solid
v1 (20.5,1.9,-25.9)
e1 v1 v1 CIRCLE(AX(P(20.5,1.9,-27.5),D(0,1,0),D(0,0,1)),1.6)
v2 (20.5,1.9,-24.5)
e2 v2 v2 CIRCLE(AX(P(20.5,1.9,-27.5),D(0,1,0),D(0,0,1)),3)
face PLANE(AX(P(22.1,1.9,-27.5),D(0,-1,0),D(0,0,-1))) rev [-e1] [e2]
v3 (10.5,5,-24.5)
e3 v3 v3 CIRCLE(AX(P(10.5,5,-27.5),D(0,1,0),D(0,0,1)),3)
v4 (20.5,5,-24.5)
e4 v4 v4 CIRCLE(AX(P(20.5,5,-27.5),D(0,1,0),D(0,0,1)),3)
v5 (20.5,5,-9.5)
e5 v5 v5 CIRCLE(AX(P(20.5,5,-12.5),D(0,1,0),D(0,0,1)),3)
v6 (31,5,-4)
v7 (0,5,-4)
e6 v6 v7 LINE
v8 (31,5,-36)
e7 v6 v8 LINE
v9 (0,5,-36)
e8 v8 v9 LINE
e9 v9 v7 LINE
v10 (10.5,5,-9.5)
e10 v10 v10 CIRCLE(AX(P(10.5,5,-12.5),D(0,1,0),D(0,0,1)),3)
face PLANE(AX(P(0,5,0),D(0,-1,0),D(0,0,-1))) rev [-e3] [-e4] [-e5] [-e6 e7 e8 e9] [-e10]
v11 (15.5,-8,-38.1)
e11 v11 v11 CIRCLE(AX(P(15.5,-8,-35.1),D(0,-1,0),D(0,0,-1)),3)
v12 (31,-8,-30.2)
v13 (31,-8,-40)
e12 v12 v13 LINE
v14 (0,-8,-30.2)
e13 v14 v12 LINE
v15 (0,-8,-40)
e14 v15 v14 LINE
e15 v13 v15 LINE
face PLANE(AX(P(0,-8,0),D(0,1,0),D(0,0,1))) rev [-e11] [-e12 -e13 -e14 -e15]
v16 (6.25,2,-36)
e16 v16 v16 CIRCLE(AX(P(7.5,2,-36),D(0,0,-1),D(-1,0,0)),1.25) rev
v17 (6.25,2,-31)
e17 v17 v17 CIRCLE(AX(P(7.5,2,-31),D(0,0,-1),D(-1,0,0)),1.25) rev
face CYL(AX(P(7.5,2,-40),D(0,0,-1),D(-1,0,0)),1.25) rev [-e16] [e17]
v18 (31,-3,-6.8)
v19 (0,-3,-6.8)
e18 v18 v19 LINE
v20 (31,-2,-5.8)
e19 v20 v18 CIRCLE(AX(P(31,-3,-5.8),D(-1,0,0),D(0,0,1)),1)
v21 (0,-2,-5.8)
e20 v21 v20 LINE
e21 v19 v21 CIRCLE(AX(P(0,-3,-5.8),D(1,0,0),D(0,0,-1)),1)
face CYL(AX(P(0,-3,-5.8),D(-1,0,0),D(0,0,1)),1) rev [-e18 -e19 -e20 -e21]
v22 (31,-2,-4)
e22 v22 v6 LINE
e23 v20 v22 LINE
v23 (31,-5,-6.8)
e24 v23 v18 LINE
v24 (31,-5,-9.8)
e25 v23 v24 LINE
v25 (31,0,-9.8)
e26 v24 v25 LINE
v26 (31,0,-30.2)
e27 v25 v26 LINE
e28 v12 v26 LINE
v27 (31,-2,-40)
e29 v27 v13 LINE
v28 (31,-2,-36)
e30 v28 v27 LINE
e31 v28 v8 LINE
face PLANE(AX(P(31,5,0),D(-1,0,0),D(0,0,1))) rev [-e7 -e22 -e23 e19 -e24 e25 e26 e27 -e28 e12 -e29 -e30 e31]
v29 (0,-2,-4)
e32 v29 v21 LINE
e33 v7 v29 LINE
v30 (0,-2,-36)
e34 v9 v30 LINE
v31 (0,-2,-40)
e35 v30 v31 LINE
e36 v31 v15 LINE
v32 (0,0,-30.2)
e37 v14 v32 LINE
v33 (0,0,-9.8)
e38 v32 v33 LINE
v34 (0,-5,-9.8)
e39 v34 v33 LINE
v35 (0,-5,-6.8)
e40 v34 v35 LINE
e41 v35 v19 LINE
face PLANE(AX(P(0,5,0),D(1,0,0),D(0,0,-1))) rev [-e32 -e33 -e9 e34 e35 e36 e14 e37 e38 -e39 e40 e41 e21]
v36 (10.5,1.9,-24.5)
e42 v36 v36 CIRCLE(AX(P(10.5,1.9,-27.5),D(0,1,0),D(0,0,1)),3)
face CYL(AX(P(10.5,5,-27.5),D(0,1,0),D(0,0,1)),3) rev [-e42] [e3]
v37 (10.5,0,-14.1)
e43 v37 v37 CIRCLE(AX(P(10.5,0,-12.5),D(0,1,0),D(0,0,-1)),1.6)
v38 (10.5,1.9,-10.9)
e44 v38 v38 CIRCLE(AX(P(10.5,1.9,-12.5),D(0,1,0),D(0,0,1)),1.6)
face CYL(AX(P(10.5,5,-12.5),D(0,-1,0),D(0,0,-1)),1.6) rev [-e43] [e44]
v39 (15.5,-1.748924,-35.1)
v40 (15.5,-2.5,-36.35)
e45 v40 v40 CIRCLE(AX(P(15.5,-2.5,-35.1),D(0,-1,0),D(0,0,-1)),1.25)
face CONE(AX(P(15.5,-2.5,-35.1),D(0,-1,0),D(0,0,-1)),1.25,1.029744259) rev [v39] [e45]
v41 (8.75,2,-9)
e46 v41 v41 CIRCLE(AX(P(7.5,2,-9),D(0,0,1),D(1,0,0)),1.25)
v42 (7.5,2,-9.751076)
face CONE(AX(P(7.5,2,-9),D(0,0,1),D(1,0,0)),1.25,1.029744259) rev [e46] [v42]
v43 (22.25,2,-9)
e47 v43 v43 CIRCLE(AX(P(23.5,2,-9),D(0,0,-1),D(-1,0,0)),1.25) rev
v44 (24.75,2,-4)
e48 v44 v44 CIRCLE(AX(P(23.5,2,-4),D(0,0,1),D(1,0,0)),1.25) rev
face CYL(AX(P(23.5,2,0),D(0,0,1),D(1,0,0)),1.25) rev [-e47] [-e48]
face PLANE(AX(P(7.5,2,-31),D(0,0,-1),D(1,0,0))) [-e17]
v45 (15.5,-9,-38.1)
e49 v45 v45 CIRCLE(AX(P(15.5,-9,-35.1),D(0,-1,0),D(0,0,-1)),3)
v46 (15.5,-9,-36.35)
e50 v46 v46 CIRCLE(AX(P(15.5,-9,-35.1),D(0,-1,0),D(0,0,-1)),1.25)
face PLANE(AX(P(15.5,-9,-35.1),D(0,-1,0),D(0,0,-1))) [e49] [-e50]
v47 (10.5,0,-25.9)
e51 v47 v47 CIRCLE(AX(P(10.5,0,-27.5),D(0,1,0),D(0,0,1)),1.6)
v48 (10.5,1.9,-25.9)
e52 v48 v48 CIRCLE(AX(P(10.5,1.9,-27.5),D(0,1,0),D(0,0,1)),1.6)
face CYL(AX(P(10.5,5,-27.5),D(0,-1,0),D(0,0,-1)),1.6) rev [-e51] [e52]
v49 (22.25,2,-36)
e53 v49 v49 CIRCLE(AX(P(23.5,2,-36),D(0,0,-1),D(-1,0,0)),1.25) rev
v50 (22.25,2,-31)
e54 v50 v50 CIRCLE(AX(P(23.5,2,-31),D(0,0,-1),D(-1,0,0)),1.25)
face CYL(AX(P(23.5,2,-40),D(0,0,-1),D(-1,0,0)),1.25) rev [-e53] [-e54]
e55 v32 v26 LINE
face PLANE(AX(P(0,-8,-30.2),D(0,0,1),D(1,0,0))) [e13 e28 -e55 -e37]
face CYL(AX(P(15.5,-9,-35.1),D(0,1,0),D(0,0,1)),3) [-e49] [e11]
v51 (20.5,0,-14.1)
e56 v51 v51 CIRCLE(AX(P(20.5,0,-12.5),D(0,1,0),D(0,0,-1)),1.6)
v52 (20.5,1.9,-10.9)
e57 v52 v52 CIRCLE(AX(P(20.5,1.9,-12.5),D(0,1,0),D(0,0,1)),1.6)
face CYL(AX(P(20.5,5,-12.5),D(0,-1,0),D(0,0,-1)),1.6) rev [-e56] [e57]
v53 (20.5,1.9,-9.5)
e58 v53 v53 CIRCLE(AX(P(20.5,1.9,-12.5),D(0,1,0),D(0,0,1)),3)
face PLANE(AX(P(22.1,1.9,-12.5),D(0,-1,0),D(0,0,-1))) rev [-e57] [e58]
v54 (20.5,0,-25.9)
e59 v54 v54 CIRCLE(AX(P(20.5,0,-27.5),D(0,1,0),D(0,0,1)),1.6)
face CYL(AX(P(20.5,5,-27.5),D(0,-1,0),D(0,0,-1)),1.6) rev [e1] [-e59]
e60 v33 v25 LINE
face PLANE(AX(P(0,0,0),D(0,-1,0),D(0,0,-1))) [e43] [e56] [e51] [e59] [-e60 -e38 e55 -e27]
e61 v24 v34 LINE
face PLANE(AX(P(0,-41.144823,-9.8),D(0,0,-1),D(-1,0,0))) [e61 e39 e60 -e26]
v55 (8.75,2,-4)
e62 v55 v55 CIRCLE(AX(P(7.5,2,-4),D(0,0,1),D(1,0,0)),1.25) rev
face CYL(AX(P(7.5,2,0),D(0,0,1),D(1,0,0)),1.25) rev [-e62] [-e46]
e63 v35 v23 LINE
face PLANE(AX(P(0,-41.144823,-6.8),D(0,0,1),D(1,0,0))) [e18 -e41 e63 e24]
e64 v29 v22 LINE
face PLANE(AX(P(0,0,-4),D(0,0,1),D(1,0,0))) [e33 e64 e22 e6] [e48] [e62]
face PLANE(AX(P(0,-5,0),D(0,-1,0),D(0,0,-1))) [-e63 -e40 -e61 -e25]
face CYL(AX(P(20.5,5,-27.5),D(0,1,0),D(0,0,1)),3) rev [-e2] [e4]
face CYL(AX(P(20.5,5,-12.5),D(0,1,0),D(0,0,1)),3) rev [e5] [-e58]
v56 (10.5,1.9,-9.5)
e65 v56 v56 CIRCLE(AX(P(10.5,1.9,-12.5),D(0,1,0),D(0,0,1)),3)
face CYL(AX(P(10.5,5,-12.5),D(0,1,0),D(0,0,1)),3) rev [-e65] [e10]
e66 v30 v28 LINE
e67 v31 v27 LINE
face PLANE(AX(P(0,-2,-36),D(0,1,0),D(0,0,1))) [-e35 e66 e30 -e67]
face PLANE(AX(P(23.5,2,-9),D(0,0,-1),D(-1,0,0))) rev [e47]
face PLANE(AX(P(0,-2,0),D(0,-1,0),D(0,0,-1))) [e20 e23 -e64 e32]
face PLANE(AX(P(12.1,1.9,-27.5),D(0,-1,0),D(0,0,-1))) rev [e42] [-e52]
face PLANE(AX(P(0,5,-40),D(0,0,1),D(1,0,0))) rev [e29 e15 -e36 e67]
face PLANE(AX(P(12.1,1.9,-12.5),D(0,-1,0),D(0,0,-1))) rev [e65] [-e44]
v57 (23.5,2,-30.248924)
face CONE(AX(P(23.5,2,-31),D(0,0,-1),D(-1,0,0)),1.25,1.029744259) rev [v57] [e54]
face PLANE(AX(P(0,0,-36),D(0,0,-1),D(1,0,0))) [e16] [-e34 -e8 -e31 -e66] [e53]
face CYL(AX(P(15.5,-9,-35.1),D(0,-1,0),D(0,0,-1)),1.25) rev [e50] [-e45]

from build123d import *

# Parameters (mm, degrees)
SKETCH_1_W                     = 31
SKETCH_1_H                     = 40
SKETCH_1_R                     = 1.6
EXTRUDE_1_DEPTH                = 5
SKETCH_2_W                     = 31
SKETCH_2_H                     = 9.8
EXTRUDE_3_DEPTH                = 8
SKETCH_13_R                    = 1
CUT_EXTRUDE_7_DEPTH            = 5
EXTRUDE_START                  = 1
SKETCH_14_R                    = 3
SKETCH_14_R_2                  = 1
EXTRUDE_8_DEPTH                = 1
HOLE_WIZARD_M3_3_D             = 2.5
HOLE_WIZARD_M3_3_DEPTH         = 6.5
HOLE_WIZARD_M3_3_TIP           = 0.751075774
SKETCH_18_W                    = 31
SKETCH_18_H                    = 3
EXTRUDE_9_DEPTH                = 10
SKETCH_29_W                    = 31
SKETCH_29_H                    = 6.8
EXTRUDE_11_DEPTH               = 2
SKETCH_20_R                    = 1
CUT_EXTRUDE_9_DEPTH            = 9
HOLE_START                     = -9
HOLE_WIZARD_M3_1_OUTLINE_R     = 1.25
HOLE_WIZARD_M3_1_OUTLINE_R_2   = 1
HOLE_WIZARD_M3_1_DEPTH         = 9
HOLE_WIZARD_M3_1_3_D           = 3.2
HOLE_WIZARD_M3_1_3_CBORE_D     = 6
HOLE_WIZARD_M3_1_3_CBORE_DEPTH = 3.1
HOLE_START_2                   = -40
HOLE_WIZARD_M3_2_OUTLINE_R     = 1.25
HOLE_WIZARD_M3_2_OUTLINE_R_2   = 1
HOLE_WIZARD_M3_2_DEPTH         = 9
FILLET_2_R                     = 1
SKETCH_30_W                    = 31
SKETCH_30_H                    = 7
CUT_EXTRUDE_10_DEPTH           = 4


# Read off the part's stored shape, not the designer's step: M3 螺纹孔1, M3 螺纹孔2
with BuildPart() as part:
    # 草图1 → 凸台-拉伸1 (new body)
    with BuildSketch(Plane(origin=(0, 0, 0), x_dir=(1, 0, 0), z_dir=(0, 1, 0))):
        with Locations((15.5, 20)):
            Rectangle(SKETCH_1_W, SKETCH_1_H)
        with Locations(Location((20.5, 27.5, 0), (0, 0, 270))):
            Circle(SKETCH_1_R, mode=Mode.SUBTRACT)
        with Locations(Location((10.5, 27.5, 0), (0, 0, 270))):
            Circle(SKETCH_1_R, mode=Mode.SUBTRACT)
        with Locations(Location((10.5, 12.5, 0), (0, 0, 90))):
            Circle(SKETCH_1_R, mode=Mode.SUBTRACT)
        with Locations(Location((20.5, 12.5, 0), (0, 0, 90))):
            Circle(SKETCH_1_R, mode=Mode.SUBTRACT)
    extrude(amount=EXTRUDE_1_DEPTH)

    # 草图2 → 凸台-拉伸3 (add)
    with BuildSketch(Plane(origin=(0, 0, 0), x_dir=(1, 0, 0), z_dir=(0, 1, 0))):
        with Locations((15.5, 35.1)):
            Rectangle(SKETCH_2_W, SKETCH_2_H)
    extrude(amount=-EXTRUDE_3_DEPTH)

    # 草图13 → 切除-拉伸7 (cut)
    with BuildSketch(Plane.XZ.offset(8)):
        with Locations(Location((15.5, -35.1, 0), (0, 0, 270))):
            Circle(SKETCH_13_R)
    extrude(amount=-CUT_EXTRUDE_7_DEPTH, mode=Mode.SUBTRACT)

    # 草图14 → 凸台-拉伸8 (add)
    with BuildSketch(Plane.XZ.offset(8).offset(EXTRUDE_START)):
        with Locations(Location((15.5, -35.1, 0), (0, 0, 270))):
            Circle(SKETCH_14_R)
        with Locations(Location((15.5, -35.1, 0), (0, 0, 270))):
            Circle(SKETCH_14_R_2, mode=Mode.SUBTRACT)
    extrude(amount=-EXTRUDE_8_DEPTH)

    # M3 螺纹孔3
    with Locations(Plane(origin=(0, -9, 0), x_dir=(-1, 0, 0), z_dir=(0, -1, 0))):
        with Locations((-15.5, 35.1)):
            Hole(HOLE_WIZARD_M3_3_D / 2, depth=HOLE_WIZARD_M3_3_DEPTH)
            with Locations((0, 0, -(HOLE_WIZARD_M3_3_DEPTH + HOLE_WIZARD_M3_3_TIP / 2))):  # 118° drill point
                Cone(0, HOLE_WIZARD_M3_3_D / 2, HOLE_WIZARD_M3_3_TIP, mode=Mode.SUBTRACT)

    # 草图18 → 凸台-拉伸9 (add)
    with BuildSketch(Plane(origin=(0, 5, 0), x_dir=(1, 0, 0), z_dir=(0, 1, 0))):
        with Locations((15.5, 8.3)):
            Rectangle(SKETCH_18_W, SKETCH_18_H)
    extrude(amount=-EXTRUDE_9_DEPTH)

    # 草图29 → 凸台-拉伸11 (add)
    with BuildSketch(Plane.XZ):
        with Locations((15.5, -3.4)):
            Rectangle(SKETCH_29_W, SKETCH_29_H)
    extrude(amount=EXTRUDE_11_DEPTH)

    # 草图20 → 切除-拉伸9 (cut)
    with BuildSketch(Plane.XY):
        with Locations((7.5, 2)):
            Circle(SKETCH_20_R)
        with Locations(Location((23.5, 2, 0), (0, 0, 180))):
            Circle(SKETCH_20_R)
    cut_extrude_9 = extrude(amount=-CUT_EXTRUDE_9_DEPTH, mode=Mode.SUBTRACT)

    # Hole Wizard M3 _1 outline → Hole Wizard M3 _1 (cut)
    with BuildSketch(Plane.XY.offset(HOLE_START)):
        with Locations((23.5, 2)):
            Circle(HOLE_WIZARD_M3_1_OUTLINE_R)
        with Locations((23.5, 2)):
            Circle(HOLE_WIZARD_M3_1_OUTLINE_R_2, mode=Mode.SUBTRACT)
    extrude(amount=HOLE_WIZARD_M3_1_DEPTH, mode=Mode.SUBTRACT)

    # Hole Wizard M3 _1 2 outline → Hole Wizard M3 _1 2 (revolve, cut)
    with BuildSketch(Plane(origin=(7.5, 2, 0), x_dir=(1, 0, 0), z_dir=(0, -1, 0))):
        Polygon((0, -9), (0, -9.751075774), (1.25, -9), (1.25, 0), (1, 0), (1, -9), align=None)
    revolve(axis=Axis((7.5, 2, 0), (0, 0, 1)), mode=Mode.SUBTRACT)

    # 镜向1: 切除-拉伸9 across plane
    add(cut_extrude_9.mirror(Plane.XY.offset(-20)), mode=Mode.SUBTRACT)

    # Hole Wizard M3 _1 3 (through all)
    with Locations(Plane(origin=(0, 5, 0), x_dir=(1, 0, 0), z_dir=(0, 1, 0))):
        with Locations((10.5, 27.5), (10.5, 12.5), (20.5, 12.5), (20.5, 27.5)):
            CounterBoreHole(HOLE_WIZARD_M3_1_3_D / 2, HOLE_WIZARD_M3_1_3_CBORE_D / 2, HOLE_WIZARD_M3_1_3_CBORE_DEPTH)

    # M3 螺纹孔2 outline → M3 螺纹孔2 (cut)
    with BuildSketch(Plane.XY.offset(HOLE_START_2)):
        with Locations((7.5, 2)):
            Circle(HOLE_WIZARD_M3_2_OUTLINE_R)
        with Locations((7.5, 2)):
            Circle(HOLE_WIZARD_M3_2_OUTLINE_R_2, mode=Mode.SUBTRACT)
    extrude(amount=HOLE_WIZARD_M3_2_DEPTH, mode=Mode.SUBTRACT)

    # Hole Wizard M3 _2 2 outline → Hole Wizard M3 _2 2 (revolve, cut)
    with BuildSketch(Plane(origin=(23.5, 2, 0), x_dir=(1, 0, 0), z_dir=(0, -1, 0))):
        Polygon((1.25, -31), (0, -30.248924226), (0, -31), (1, -31), (1, -40), (1.25, -40), align=None)
    revolve(axis=Axis((23.5, 2, 0), (0, 0, 1)), mode=Mode.SUBTRACT)

    # 圆角2
    fillet_2_edges = [part.edges().sort_by_distance(p)[0] for p in [
        (15.5, -2, -6.8),
    ]]
    fillet(fillet_2_edges, radius=FILLET_2_R)

    # 草图30 → 切除-拉伸10 (cut)
    with BuildSketch(Plane.XY):
        with Locations((15.5, 1.5)):
            Rectangle(SKETCH_30_W, SKETCH_30_H)
    cut_extrude_10 = extrude(amount=-CUT_EXTRUDE_10_DEPTH, mode=Mode.SUBTRACT)

    # 镜向3: 切除-拉伸10 across plane
    add(cut_extrude_10.mirror(Plane.XY.offset(-20)), mode=Mode.SUBTRACT)


solid = part.part
